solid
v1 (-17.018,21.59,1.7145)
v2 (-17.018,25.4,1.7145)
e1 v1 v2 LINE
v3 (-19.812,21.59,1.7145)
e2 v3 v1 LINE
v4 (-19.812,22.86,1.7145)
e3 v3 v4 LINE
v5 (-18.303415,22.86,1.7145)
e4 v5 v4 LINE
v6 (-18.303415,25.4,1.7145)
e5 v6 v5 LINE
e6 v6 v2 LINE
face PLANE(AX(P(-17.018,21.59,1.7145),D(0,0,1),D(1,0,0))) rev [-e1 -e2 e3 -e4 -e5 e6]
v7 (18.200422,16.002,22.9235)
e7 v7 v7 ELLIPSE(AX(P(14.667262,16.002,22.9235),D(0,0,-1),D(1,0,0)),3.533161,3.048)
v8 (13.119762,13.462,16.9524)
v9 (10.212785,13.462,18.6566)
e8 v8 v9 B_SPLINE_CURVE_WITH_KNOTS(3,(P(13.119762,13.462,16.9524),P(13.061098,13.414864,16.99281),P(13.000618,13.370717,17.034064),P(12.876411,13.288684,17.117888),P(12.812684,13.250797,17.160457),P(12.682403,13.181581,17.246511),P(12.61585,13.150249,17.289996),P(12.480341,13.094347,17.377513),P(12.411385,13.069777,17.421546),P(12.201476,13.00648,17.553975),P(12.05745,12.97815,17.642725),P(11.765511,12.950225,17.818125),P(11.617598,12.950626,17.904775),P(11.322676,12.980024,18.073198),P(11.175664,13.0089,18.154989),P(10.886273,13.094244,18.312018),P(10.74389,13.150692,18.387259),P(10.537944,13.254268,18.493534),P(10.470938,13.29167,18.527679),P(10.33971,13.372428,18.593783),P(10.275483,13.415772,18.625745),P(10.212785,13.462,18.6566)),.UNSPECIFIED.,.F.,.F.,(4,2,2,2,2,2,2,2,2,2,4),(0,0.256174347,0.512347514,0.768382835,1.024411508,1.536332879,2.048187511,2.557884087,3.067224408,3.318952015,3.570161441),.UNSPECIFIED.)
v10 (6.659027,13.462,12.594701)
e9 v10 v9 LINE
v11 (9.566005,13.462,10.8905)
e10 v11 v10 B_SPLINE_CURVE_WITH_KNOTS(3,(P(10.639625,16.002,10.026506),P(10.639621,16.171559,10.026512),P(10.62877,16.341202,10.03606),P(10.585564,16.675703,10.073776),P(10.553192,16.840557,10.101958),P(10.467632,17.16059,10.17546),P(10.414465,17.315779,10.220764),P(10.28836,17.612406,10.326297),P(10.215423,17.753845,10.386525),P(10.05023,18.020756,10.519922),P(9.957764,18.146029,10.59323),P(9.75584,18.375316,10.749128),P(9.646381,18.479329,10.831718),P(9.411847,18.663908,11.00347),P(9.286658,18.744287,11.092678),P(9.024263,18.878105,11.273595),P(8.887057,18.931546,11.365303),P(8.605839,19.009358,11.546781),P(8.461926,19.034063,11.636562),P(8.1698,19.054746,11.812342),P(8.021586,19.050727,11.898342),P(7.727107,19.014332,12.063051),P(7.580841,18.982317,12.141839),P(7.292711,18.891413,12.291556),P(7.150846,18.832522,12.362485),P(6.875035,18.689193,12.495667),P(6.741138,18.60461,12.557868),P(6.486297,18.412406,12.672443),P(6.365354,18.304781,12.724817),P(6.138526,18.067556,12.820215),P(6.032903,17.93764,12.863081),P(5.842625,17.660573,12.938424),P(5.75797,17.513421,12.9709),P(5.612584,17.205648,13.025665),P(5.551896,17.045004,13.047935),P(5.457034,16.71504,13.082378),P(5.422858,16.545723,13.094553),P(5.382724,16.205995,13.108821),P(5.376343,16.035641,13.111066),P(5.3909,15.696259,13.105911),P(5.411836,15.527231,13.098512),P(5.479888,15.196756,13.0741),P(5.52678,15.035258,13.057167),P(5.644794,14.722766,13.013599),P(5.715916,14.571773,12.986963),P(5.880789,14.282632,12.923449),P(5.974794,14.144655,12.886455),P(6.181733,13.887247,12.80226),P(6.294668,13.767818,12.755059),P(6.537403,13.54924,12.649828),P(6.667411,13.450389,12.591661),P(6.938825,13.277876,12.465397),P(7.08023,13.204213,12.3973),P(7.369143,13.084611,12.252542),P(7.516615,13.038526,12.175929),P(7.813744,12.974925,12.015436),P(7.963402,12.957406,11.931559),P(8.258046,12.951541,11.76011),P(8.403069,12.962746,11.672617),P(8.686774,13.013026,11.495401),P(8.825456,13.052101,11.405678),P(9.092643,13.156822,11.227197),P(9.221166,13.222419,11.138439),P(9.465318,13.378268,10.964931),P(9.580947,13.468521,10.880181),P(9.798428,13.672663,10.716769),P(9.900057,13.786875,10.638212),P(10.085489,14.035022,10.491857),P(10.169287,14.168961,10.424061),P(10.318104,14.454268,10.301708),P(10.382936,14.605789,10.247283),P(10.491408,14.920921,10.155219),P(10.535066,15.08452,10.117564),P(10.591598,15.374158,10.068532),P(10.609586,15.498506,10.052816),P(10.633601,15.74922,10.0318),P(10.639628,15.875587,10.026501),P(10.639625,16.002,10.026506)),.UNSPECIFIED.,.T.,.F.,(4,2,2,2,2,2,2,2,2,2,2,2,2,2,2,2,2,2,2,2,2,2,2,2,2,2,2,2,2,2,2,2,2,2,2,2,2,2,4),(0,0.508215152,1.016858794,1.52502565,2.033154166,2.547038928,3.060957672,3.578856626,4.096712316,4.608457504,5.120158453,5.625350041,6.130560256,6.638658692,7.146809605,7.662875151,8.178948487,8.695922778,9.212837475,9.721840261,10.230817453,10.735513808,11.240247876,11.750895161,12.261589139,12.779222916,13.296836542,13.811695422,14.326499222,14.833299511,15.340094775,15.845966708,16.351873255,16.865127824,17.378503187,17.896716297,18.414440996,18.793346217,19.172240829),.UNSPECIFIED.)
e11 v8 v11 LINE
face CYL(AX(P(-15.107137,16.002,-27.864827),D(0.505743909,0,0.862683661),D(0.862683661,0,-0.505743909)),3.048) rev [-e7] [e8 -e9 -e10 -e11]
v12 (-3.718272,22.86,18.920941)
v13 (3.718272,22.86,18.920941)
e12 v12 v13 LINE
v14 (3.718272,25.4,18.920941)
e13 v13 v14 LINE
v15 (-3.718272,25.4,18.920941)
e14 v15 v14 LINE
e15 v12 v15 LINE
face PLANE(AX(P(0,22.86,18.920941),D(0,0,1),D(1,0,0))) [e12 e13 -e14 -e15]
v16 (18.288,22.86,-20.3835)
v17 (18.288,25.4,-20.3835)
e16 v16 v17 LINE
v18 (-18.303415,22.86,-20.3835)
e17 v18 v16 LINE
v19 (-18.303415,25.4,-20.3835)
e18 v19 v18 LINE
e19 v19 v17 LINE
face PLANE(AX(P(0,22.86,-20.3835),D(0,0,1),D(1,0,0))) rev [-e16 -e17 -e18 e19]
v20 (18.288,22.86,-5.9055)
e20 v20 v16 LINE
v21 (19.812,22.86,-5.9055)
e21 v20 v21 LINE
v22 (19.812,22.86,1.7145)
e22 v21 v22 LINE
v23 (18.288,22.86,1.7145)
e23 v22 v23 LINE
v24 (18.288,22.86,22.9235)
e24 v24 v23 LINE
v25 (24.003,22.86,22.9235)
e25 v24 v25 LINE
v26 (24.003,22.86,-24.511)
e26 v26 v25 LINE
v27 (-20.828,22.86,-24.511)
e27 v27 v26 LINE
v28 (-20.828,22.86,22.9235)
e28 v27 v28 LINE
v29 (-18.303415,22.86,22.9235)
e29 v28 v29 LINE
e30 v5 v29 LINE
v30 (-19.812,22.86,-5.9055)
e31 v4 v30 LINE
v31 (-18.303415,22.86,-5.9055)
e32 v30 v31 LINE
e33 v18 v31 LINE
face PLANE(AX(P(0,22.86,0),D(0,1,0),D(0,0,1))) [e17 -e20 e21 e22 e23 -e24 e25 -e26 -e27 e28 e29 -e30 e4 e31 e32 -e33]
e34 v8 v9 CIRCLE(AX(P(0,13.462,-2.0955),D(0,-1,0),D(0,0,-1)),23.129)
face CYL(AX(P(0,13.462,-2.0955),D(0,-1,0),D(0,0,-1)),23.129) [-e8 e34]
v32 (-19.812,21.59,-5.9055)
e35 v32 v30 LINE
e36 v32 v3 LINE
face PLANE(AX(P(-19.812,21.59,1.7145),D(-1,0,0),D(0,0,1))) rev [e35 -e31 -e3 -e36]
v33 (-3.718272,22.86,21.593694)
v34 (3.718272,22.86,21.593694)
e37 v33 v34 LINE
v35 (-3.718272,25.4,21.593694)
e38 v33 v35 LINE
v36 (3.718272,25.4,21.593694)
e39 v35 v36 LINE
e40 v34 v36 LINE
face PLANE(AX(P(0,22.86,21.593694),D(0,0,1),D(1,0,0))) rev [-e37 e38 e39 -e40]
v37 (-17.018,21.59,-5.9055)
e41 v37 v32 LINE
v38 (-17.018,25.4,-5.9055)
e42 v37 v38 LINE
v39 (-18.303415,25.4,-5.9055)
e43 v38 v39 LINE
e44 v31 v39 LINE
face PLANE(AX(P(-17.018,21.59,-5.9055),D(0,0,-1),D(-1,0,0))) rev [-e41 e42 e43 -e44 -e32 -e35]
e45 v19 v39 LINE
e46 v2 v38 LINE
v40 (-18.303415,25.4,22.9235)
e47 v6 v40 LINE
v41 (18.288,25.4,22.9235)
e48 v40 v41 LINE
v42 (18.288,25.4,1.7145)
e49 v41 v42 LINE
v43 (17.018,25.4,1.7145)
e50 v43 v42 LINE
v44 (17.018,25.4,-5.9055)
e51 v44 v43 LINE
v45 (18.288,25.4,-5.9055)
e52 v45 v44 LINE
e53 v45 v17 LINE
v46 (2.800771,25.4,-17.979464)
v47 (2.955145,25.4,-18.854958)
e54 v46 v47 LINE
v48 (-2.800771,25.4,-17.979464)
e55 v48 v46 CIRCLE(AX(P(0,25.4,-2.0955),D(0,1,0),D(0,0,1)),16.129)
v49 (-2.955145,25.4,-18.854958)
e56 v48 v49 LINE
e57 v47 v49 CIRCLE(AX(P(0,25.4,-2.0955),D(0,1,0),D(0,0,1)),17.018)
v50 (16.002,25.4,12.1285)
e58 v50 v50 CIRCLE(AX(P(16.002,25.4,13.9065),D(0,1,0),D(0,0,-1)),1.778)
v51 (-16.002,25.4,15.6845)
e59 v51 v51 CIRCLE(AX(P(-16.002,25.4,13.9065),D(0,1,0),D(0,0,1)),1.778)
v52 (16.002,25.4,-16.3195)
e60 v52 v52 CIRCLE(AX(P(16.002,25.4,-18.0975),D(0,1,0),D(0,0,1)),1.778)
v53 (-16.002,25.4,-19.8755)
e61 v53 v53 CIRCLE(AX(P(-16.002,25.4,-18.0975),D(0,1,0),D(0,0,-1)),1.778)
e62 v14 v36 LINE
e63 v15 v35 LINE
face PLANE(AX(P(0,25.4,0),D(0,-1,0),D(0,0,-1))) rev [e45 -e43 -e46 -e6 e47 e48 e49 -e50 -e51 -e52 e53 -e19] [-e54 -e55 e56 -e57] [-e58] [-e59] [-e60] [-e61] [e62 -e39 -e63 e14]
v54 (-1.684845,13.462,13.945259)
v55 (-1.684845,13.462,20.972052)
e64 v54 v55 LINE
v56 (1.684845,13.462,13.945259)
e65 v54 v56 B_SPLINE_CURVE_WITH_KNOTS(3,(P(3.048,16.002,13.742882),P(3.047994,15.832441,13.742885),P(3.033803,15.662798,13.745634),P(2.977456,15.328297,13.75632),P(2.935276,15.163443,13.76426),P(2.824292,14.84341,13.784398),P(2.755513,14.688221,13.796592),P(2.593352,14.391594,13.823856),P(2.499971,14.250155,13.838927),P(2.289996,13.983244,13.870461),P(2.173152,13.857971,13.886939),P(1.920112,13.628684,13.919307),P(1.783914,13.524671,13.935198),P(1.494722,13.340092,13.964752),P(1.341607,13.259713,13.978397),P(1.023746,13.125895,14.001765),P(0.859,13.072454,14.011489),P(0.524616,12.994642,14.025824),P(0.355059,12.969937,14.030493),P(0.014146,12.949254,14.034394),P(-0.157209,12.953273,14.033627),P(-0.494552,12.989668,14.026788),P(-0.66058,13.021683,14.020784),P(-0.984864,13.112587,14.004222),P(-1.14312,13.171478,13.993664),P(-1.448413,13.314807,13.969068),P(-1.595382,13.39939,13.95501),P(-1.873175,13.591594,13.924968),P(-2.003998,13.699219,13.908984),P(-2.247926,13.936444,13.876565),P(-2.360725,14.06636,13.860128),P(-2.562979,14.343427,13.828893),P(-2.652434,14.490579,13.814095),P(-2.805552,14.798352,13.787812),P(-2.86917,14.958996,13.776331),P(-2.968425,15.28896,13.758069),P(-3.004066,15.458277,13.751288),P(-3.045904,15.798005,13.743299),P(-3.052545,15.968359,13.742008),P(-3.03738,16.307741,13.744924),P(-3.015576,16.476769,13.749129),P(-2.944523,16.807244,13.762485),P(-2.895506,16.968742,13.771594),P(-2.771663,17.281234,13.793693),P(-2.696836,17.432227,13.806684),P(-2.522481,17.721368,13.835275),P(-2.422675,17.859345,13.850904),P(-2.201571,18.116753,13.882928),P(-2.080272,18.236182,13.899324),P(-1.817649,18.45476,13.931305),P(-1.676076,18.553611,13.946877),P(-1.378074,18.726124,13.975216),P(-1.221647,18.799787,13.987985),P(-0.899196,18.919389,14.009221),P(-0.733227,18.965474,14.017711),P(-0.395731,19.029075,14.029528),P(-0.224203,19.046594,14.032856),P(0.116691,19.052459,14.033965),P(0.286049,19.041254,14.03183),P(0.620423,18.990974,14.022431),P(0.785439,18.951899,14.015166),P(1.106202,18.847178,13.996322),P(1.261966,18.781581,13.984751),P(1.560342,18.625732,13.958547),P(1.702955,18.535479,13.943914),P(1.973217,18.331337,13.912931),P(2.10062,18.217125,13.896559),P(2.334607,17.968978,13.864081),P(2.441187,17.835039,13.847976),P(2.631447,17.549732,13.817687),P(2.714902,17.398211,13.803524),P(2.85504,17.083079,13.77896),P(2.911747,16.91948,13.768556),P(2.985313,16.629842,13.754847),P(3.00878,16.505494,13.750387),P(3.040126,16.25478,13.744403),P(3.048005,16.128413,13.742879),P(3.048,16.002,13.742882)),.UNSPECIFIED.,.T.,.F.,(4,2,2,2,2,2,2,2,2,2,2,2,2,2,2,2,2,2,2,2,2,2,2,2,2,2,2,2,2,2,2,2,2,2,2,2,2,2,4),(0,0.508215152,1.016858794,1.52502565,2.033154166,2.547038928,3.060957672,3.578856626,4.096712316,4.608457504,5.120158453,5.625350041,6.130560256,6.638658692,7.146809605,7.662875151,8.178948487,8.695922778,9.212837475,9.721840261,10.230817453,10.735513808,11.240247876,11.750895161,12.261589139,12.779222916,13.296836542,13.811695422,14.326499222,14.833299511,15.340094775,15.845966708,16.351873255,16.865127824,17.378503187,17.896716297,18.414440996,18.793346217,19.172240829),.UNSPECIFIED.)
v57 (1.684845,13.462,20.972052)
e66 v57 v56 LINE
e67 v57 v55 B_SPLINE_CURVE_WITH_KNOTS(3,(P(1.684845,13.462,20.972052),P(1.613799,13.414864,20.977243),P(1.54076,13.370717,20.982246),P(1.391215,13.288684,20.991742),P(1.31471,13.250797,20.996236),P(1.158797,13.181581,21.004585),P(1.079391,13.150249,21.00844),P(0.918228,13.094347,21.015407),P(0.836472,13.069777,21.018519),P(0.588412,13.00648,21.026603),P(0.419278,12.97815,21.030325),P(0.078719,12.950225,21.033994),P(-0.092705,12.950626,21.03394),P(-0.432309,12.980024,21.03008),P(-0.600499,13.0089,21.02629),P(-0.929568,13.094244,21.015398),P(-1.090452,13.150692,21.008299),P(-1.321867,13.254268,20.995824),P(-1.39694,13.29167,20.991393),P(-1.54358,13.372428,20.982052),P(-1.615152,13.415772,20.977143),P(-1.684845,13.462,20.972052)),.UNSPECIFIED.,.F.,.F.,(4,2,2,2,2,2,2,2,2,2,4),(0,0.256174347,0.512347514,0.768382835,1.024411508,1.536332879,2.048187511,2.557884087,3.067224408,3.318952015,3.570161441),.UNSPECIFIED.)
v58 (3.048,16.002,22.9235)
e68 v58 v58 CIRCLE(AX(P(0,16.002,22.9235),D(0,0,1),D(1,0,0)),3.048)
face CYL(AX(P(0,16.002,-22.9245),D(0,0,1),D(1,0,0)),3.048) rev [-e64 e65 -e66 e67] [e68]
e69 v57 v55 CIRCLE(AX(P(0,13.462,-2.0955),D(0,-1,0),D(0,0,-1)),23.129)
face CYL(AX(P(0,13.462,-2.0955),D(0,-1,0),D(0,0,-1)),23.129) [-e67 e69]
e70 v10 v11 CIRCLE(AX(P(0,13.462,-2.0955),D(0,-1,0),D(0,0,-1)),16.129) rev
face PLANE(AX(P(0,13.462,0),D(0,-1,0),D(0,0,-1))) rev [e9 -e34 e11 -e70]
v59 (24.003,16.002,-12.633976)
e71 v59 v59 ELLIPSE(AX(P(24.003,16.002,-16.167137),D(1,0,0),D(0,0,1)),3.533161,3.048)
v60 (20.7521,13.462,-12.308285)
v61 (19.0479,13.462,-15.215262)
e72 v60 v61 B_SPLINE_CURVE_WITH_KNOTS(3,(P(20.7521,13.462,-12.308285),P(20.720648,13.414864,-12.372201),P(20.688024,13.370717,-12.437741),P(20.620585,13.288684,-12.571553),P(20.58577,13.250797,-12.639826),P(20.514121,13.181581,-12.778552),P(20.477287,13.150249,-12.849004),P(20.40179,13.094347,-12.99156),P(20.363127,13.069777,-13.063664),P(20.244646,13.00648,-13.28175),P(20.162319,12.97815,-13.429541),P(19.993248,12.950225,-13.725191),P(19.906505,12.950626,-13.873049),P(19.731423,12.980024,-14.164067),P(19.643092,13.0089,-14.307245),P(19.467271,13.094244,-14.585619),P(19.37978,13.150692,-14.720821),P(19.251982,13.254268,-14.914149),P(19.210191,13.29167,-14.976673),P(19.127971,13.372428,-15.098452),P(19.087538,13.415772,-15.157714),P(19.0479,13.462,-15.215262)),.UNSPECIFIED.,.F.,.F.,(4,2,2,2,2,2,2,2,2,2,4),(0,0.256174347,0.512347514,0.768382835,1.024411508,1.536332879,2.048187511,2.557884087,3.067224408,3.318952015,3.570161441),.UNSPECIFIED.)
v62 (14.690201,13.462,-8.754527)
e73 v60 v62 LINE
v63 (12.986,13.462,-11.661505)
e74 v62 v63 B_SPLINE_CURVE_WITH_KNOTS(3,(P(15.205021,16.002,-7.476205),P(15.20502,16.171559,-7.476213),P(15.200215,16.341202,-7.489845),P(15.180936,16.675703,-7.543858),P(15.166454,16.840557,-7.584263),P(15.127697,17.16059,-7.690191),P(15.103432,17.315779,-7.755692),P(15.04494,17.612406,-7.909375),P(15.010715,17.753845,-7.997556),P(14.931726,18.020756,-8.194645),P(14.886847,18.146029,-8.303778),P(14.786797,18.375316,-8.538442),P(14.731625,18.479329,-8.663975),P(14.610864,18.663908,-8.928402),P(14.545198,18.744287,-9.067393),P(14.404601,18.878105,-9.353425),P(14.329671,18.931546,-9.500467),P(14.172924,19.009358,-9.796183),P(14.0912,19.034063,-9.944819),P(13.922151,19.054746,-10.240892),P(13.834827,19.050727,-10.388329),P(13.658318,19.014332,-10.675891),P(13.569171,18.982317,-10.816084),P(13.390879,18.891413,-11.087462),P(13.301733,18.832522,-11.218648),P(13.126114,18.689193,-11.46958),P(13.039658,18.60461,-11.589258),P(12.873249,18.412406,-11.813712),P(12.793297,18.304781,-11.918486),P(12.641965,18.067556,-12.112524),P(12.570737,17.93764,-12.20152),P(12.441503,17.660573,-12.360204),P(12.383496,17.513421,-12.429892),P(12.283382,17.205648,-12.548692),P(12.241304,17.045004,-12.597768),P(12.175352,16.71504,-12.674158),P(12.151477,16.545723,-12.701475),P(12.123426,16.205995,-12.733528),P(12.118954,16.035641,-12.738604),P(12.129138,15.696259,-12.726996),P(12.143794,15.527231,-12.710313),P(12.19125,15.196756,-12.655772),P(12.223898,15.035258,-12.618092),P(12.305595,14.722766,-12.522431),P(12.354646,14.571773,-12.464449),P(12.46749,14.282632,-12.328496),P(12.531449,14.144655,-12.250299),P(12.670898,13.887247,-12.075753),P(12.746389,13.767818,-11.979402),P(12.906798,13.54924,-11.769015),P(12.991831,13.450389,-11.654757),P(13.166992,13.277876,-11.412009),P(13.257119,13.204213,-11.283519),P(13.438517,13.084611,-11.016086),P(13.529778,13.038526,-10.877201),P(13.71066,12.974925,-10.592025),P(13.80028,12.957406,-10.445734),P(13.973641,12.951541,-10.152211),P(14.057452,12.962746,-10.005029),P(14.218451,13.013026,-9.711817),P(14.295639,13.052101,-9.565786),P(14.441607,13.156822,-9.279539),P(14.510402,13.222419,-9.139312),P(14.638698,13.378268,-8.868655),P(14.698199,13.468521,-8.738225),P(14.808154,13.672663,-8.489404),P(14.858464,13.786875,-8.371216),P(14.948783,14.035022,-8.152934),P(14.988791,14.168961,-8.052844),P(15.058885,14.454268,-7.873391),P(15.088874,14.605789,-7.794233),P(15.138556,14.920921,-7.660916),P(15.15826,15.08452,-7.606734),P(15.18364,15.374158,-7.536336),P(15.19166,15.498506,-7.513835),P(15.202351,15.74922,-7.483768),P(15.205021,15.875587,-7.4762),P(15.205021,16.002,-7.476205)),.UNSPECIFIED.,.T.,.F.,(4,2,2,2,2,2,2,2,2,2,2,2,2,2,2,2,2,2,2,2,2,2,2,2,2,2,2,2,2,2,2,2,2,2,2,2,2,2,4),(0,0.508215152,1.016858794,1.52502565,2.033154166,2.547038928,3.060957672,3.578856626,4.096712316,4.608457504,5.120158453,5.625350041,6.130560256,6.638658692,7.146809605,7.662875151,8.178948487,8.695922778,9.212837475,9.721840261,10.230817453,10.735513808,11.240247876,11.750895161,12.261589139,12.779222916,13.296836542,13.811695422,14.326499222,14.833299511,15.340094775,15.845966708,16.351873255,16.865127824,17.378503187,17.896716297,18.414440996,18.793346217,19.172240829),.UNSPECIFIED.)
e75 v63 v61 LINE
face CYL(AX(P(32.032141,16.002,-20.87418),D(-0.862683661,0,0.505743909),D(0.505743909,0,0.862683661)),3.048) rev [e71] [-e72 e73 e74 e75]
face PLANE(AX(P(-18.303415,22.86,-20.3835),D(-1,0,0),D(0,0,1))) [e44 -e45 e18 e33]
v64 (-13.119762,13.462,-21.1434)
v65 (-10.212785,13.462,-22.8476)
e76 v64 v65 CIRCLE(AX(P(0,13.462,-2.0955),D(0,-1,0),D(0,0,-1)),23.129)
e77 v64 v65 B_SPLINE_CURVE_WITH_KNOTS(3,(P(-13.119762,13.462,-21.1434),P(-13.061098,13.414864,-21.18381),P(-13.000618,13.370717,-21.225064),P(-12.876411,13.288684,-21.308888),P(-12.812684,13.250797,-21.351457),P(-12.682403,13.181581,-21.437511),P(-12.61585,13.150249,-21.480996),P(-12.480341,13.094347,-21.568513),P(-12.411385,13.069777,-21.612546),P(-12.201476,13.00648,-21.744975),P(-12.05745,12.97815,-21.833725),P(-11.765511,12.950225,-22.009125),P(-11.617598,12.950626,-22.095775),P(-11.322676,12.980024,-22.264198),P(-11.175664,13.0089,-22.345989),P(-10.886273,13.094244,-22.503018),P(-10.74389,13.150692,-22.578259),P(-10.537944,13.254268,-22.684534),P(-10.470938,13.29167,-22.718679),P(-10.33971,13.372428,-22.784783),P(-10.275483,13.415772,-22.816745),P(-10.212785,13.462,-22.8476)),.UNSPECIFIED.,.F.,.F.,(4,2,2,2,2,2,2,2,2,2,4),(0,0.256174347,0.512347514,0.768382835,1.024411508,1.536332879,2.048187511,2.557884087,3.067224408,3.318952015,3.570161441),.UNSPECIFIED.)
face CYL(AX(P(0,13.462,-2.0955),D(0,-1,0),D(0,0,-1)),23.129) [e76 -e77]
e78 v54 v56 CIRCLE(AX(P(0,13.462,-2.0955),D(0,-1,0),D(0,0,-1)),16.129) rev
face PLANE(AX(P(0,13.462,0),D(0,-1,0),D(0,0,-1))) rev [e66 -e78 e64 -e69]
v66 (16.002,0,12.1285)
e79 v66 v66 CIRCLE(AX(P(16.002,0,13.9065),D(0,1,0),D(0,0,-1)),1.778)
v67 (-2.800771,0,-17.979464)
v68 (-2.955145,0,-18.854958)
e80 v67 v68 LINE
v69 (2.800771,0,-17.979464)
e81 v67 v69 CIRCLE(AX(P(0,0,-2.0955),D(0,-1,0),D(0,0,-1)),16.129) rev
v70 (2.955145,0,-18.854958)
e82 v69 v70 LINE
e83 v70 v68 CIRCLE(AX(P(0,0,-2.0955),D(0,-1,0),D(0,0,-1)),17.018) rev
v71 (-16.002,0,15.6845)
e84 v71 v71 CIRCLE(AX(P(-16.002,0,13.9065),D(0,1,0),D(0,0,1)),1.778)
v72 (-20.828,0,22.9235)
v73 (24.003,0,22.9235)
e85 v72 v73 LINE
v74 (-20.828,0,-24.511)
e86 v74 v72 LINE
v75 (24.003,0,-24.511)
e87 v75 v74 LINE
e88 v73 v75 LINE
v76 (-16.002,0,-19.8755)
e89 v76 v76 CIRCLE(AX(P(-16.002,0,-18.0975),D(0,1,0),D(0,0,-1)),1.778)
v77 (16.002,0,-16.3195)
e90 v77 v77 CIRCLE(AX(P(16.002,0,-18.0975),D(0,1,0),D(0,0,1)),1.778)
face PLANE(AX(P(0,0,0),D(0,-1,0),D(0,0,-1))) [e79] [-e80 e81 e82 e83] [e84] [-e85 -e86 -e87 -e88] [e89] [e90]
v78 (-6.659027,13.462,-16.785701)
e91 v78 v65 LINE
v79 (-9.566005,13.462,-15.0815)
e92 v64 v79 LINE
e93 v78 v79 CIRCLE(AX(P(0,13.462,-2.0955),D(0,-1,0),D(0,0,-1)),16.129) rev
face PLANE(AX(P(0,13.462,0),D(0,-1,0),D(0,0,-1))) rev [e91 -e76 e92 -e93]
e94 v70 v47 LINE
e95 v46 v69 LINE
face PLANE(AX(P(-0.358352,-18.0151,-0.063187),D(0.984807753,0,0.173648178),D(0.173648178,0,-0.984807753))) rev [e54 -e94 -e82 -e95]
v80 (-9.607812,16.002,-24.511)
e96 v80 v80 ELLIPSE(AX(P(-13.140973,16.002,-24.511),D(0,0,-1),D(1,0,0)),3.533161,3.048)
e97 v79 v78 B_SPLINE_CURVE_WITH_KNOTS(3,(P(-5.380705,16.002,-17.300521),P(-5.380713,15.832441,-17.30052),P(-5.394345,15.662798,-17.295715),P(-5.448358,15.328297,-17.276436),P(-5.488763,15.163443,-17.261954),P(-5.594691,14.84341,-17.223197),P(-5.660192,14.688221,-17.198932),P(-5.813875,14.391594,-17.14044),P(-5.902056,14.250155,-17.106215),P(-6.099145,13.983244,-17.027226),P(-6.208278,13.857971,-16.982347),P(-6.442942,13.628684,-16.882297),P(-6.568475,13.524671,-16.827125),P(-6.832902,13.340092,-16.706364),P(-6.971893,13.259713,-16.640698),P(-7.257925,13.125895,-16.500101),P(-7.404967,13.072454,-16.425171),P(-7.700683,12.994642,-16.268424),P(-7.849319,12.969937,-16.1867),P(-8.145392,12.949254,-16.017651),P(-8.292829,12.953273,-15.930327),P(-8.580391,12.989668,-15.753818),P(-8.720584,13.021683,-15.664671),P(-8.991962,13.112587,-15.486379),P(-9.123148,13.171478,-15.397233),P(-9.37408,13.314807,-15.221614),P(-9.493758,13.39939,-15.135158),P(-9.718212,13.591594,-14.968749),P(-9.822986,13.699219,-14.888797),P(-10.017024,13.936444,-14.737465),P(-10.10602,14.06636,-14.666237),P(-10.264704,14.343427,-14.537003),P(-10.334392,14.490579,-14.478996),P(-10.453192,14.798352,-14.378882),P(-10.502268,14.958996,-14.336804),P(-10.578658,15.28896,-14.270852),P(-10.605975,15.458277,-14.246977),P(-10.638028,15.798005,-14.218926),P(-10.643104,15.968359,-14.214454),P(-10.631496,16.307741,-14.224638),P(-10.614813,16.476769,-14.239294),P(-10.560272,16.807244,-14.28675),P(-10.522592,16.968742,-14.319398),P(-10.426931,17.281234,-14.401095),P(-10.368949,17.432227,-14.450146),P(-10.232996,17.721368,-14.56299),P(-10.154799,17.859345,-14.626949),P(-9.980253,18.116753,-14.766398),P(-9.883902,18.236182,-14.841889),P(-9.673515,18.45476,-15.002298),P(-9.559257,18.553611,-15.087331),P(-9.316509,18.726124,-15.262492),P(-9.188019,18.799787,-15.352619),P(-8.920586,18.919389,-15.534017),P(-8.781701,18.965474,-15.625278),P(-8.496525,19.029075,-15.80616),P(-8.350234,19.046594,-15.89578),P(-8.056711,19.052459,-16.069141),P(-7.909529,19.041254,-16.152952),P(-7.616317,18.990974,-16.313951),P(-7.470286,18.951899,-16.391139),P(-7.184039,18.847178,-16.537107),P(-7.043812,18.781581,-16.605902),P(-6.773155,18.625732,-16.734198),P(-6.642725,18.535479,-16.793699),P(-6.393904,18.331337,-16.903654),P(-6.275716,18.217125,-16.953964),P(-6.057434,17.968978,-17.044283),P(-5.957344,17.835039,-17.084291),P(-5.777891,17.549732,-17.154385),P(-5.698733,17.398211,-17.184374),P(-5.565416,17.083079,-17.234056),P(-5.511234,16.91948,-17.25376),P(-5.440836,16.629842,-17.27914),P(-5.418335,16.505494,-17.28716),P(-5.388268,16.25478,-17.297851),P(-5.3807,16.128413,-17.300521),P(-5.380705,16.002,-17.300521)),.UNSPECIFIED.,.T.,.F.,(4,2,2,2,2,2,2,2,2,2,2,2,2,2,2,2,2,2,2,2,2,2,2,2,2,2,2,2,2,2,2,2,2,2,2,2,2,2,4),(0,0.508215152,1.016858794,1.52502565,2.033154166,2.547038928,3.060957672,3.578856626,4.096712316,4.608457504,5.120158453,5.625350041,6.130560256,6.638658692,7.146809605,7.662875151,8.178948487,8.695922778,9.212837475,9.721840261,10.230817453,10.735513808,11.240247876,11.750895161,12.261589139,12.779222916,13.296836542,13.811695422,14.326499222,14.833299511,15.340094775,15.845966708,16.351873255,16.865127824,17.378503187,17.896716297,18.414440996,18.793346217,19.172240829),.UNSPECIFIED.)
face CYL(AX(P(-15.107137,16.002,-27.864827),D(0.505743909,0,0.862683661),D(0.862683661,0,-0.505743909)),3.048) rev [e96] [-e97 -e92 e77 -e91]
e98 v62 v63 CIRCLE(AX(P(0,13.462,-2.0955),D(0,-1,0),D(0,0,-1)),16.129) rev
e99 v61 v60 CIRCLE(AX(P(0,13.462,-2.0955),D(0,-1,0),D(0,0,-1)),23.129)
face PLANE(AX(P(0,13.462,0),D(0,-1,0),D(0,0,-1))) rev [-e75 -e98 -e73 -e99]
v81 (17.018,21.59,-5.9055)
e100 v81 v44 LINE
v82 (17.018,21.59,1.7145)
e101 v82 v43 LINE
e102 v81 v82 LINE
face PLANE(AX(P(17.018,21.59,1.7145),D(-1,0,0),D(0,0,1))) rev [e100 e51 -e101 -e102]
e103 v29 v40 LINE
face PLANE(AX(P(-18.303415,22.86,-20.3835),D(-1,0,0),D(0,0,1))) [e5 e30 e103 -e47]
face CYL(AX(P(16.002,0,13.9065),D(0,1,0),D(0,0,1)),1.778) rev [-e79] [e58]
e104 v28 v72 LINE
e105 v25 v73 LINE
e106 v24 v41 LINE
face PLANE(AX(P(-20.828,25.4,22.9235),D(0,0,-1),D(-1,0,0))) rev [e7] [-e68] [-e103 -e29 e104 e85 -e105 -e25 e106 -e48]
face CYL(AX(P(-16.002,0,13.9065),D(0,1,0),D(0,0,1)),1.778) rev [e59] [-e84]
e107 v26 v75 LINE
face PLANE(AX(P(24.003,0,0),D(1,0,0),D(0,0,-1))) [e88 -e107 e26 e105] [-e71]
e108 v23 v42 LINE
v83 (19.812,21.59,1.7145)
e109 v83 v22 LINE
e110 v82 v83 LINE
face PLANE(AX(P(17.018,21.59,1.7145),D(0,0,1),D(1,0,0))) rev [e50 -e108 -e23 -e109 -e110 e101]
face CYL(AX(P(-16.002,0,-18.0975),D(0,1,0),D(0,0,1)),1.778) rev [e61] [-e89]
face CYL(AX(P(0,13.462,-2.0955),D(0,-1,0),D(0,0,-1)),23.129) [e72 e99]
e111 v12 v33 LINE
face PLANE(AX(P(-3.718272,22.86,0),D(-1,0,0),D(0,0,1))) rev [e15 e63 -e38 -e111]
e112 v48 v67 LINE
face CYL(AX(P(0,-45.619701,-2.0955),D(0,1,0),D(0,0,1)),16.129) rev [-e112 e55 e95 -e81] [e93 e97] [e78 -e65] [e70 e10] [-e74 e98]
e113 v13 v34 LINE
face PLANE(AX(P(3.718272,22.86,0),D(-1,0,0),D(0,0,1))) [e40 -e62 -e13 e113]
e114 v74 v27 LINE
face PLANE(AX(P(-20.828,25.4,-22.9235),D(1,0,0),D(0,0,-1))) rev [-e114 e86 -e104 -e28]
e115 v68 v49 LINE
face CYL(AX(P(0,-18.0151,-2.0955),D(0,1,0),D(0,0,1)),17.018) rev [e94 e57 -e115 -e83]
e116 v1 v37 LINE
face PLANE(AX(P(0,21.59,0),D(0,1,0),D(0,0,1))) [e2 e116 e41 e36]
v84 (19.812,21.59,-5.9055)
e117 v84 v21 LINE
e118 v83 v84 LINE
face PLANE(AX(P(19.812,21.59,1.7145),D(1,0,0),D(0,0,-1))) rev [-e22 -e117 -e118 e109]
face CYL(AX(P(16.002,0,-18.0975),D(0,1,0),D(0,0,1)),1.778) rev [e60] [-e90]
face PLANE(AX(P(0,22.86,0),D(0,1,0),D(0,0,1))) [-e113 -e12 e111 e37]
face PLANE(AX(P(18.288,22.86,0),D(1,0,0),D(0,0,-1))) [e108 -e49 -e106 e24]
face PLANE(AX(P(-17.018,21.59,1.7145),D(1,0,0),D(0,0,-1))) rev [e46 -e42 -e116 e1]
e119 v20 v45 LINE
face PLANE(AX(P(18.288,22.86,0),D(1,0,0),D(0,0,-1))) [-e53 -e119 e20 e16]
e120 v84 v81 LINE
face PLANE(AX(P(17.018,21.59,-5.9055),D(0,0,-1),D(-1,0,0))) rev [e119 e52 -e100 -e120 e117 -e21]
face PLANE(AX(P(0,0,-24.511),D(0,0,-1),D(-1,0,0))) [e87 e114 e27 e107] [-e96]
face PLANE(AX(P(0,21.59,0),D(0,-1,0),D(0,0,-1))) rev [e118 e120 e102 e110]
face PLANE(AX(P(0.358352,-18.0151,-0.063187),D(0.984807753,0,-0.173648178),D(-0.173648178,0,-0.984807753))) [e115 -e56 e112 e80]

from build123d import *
from build123d.topology import SkipClean

# Parameters (mm, degrees)
SKETCH1_W                = 41.656
SKETCH1_H                = 45.847
BOSS_EXTRUDE1_DEPTH      = 25.4
SKETCH2_R                = 16.129
CUT_EXTRUDE1_DEPTH       = 25.4
SKETCH3_W                = 2.794
SKETCH3_H                = 7.62
CUT_EXTRUDE2_DEPTH       = 3.81
CUT_EXTRUDE6_START       = -25.4
CUT_EXTRUDE6_DEPTH       = 25.4
CUT_EXTRUDE7_REACH       = 58.4
CUT_EXTRUDE7_END_RADIUS  = 16.129
SKETCH7_R                = 3.048
SKETCH14_W               = 7.43654476
SKETCH14_H               = 2.672753785
SKETCH14_W_2             = 2.524584731
SKETCH14_H_2             = 43.307
CUT_EXTRUDE10_DEPTH      = 2.54
SKETCH17_W               = 45.847
SKETCH17_H               = 22.86
BOSS_EXTRUDE3_DEPTH      = 3.175
CUT_EXTRUDE12_REACH      = 43.576
SKETCH12_R               = 3.048
SKETCH18_W               = 44.831
SKETCH18_H               = 22.86
BOSS_EXTRUDE4_DEPTH      = 1.5875
CUT_EXTRUDE13_DEPTH      = 44.190833792
CUT_EXTRUDE13_DEPTH_BACK = 44.190833792
SKETCH11_R               = 3.048
BOSS_EXTRUDE8_START      = -13.462
BOSS_EXTRUDE8_DEPTH      = 1.462
SKETCH4_R                = 1.778
CUT_EXTRUDE14_DEPTH      = 43.685983001


with BuildPart() as part:
    # Sketch1 → Boss-Extrude1 (new body)
    with BuildSketch(Plane(origin=(0, 0, 0), x_dir=(1, 0, 0), z_dir=(0, 1, 0))):
        Rectangle(SKETCH1_W, SKETCH1_H)
    extrude(amount=BOSS_EXTRUDE1_DEPTH)

    # Sketch2 → Cut-Extrude1 (cut)
    with BuildSketch(Plane(origin=(0, 25.4, 0), x_dir=(1, 0, 0), z_dir=(0, 1, 0))):
        with Locations(Location((0, 2.0955, 0), (0, 0, 270))):
            Circle(SKETCH2_R)
    extrude(amount=-CUT_EXTRUDE1_DEPTH, mode=Mode.SUBTRACT)

    # Sketch3 → Cut-Extrude2 (cut)
    with BuildSketch(Plane(origin=(0, 25.4, 0), x_dir=(1, 0, 0), z_dir=(0, 1, 0))):
        with Locations((18.415, 2.0955)):
            Rectangle(SKETCH3_W, SKETCH3_H)
        with Locations((-18.415, 2.0955)):
            Rectangle(SKETCH3_W, SKETCH3_H)
    extrude(amount=-CUT_EXTRUDE2_DEPTH, mode=Mode.SUBTRACT)

    # Sketch6 → Cut-Extrude6 (cut)
    with BuildSketch(Plane(origin=(0, 25.4, 0), x_dir=(1, 0, 0), z_dir=(0, 1, 0)).offset(CUT_EXTRUDE6_START)):
        with BuildLine():
            ThreePointArc((-2.800771458, 17.979464248), (-1.405734975, 18.163124286), (0, 18.2245))
            ThreePointArc((0, 18.2245), (1.405734975, 18.163124286), (2.800771458, 17.979464248))
            Line((2.800771458, 17.979464248), (2.955144688, 18.854958341))
            ThreePointArc((2.955144688, 18.854958341), (0, 19.1135), (-2.955144688, 18.854958341))
            Line((-2.955144688, 18.854958341), (-2.800771458, 17.979464248))
        make_face()
        with BuildLine():
            Line((0, 18.2245), (0, 2.0955))
            Line((0, 2.0955), (2.800771458, 17.979464248))
            ThreePointArc((2.800771458, 17.979464248), (1.405734975, 18.163124286), (0, 18.2245))
        make_face()
        with BuildLine():
            Line((-2.800771458, 17.979464248), (0, 2.0955))
            Line((0, 2.0955), (0, 18.2245))
            ThreePointArc((0, 18.2245), (-1.405734975, 18.163124286), (-2.800771458, 17.979464248))
        make_face()
    extrude(amount=CUT_EXTRUDE6_DEPTH, mode=Mode.SUBTRACT)

    # Cut-Extrude7: up to this cylinder (the profile starts outside it)
    cut_extrude7_end = Plane(origin=(0, 16.002, -2.0955), z_dir=(0, 1, 0)) * Cylinder(CUT_EXTRUDE7_END_RADIUS, 150.058, mode=Mode.PRIVATE)
    # Sketch7 → Cut-Extrude7 (cut, up to the surface)
    with BuildSketch(Plane.XY.offset(22.9235), mode=Mode.PRIVATE) as cut_extrude7_sk1:
        with Locations((0, 16.002)):
            Circle(SKETCH7_R)
    cut_extrude7_tool1 = extrude(cut_extrude7_sk1.sketch, amount=-CUT_EXTRUDE7_REACH, mode=Mode.PRIVATE) - cut_extrude7_end
    add(cut_extrude7_tool1.solids().sort_by_distance((0, 16.002, 22.9235))[0], mode=Mode.SUBTRACT)

    # Sketch14 → Cut-Extrude10 (cut)
    with BuildSketch(Plane(origin=(0, 25.4, 0), x_dir=(1, 0, 0), z_dir=(0, 1, 0))):
        with Locations((0, -20.25731759)):
            Rectangle(SKETCH14_W, SKETCH14_H)
        Polygon((20.828, -22.9235), (20.828, 20.3835), (18.288, 20.3835), (18.288, 5.9055), (19.812, 5.9055), (19.812, -1.7145), (18.288, -1.7145), (18.288, -22.9235), align=None)
        Polygon((20.828, 22.9235), (-20.828, 22.9235), (-20.828, 20.3835), (-18.303415269, 20.3835), (18.288, 20.3835), (20.828, 20.3835), align=None)
        with Locations((-19.565707635, -1.27)):
            Rectangle(SKETCH14_W_2, SKETCH14_H_2)
    extrude(amount=-CUT_EXTRUDE10_DEPTH, mode=Mode.SUBTRACT)

    # Sketch17 → Boss-Extrude3 (add)
    with BuildSketch(Plane(origin=(20.828, 0, 0), x_dir=(0, 0, -1), z_dir=(1, 0, 0))):
        with Locations((0, 11.43)):
            Rectangle(SKETCH17_W, SKETCH17_H)
    extrude(amount=BOSS_EXTRUDE3_DEPTH)

    # Cut-Extrude12: up to this plane
    cut_extrude12_end = Plane(origin=(24.003, 0, 0), z_dir=(1, 0, 0))
    # Sketch12 → Cut-Extrude12 (cut, up to the surface)
    with BuildSketch(Plane(origin=(0.914260378, 0, -0.535980498), x_dir=(-0.50574390925612, 0, -0.862683660590797), z_dir=(0.862683660590797, 0, -0.50574390925612)), mode=Mode.PRIVATE) as cut_extrude12_sk1:
        with Locations(Location((1.807753611, 16.002, 0), (0, 0, 180))):
            Circle(SKETCH12_R)
    cut_extrude12_tool1 = split(extrude(cut_extrude12_sk1.sketch, amount=CUT_EXTRUDE12_REACH, mode=Mode.PRIVATE), bisect_by=cut_extrude12_end, keep=Keep.BOTH, mode=Mode.PRIVATE)
    add(cut_extrude12_tool1.solids().sort_by_distance((0, 16.002, -2.0955))[0], mode=Mode.SUBTRACT)

    # Sketch18 → Boss-Extrude4 (add)
    with BuildSketch(Plane(origin=(0, 0, -22.9235), x_dir=(-1, 0, 0), z_dir=(0, 0, -1))):
        with Locations((-1.5875, 11.43)):
            Rectangle(SKETCH18_W, SKETCH18_H)
    extrude(amount=BOSS_EXTRUDE4_DEPTH)

    # Sketch11 → Cut-Extrude13 (cut, two sides: drawn at the far end of the back side and taken through both)
    with BuildSketch(Plane(origin=(-0.914260378, 0, -1.559519502), x_dir=(0.862683660590797, 0, -0.50574390925612), z_dir=(0.50574390925612, 0, 0.862683660590797)).offset(-CUT_EXTRUDE13_DEPTH_BACK)):
        with Locations((1.059786362, 16.002)):
            Circle(SKETCH11_R)
    extrude(amount=CUT_EXTRUDE13_DEPTH + CUT_EXTRUDE13_DEPTH_BACK, mode=Mode.SUBTRACT)

    # Boss-Extrude8: read off the stored shape, not the designer's step
    # Boss-Extrude8 outline → Boss-Extrude8 (add)
    with SkipClean():  # the faces are left unmerged after this step: merging them gives an invalid solid
        with BuildSketch(Plane.XZ.offset(BOSS_EXTRUDE8_START)):
            with BuildLine():
                ThreePointArc((13.119762317, 16.952399563), (11.697350877, 17.857510386), (10.212785134, 18.656600154))
                Line((10.212785134, 18.656600154), (6.659027379, 12.594700658))
                ThreePointArc((6.659027379, 12.594700658), (8.157143512, 11.818724762), (9.566004562, 10.890500066))
                Line((9.566004562, 10.890500066), (13.119762317, 16.952399563))
            make_face()
            with BuildLine():
                ThreePointArc((-6.659027379, -16.785700658), (-8.157143512, -16.009724762), (-9.566004562, -15.081500066))
                Line((-9.566004562, -15.081500066), (-13.119762317, -21.143399563))
                ThreePointArc((-13.119762317, -21.143399563), (-11.697350877, -22.048510386), (-10.212785134, -22.847600154))
                Line((-10.212785134, -22.847600154), (-6.659027379, -16.785700658))
            make_face()
            with BuildLine():
                Line((20.752100154, -12.308285134), (14.690200658, -8.754527379))
                ThreePointArc((14.690200658, -8.754527379), (13.914224762, -10.252643512), (12.986000066, -11.661504562))
                Line((12.986000066, -11.661504562), (19.047899563, -15.215262317))
                ThreePointArc((19.047899563, -15.215262317), (19.953010386, -13.792850877), (20.752100154, -12.308285134))
            make_face()
            with BuildLine():
                ThreePointArc((1.684845394, 20.972051604), (0, 21.0335), (-1.684845394, 20.972051604))
                Line((-1.684845394, 20.972051604), (-1.684845394, 13.945258617))
                ThreePointArc((-1.684845394, 13.945258617), (0, 14.0335), (1.684845394, 13.945258617))
                Line((1.684845394, 13.945258617), (1.684845394, 20.972051604))
            make_face()
        extrude(amount=BOSS_EXTRUDE8_DEPTH)

    # Sketch4 → Cut-Extrude14 (cut, through all)
    with SkipClean():  # the faces are left unmerged after this step: merging them gives an invalid solid
        with BuildSketch(Plane(origin=(0, 25.4, 0), x_dir=(1, 0, 0), z_dir=(0, 1, 0))):
            with Locations(Location((-16.002, -13.9065, 0), (0, 0, 270))):
                Circle(SKETCH4_R)
            with Locations(Location((-16.002, 18.0975, 0), (0, 0, 90))):
                Circle(SKETCH4_R)
            with Locations(Location((16.002, 18.0975, 0), (0, 0, 270))):
                Circle(SKETCH4_R)
            with Locations(Location((16.002, -13.9065, 0), (0, 0, 90))):
                Circle(SKETCH4_R)
        extrude(amount=-CUT_EXTRUDE14_DEPTH, mode=Mode.SUBTRACT)


solid = part.part
